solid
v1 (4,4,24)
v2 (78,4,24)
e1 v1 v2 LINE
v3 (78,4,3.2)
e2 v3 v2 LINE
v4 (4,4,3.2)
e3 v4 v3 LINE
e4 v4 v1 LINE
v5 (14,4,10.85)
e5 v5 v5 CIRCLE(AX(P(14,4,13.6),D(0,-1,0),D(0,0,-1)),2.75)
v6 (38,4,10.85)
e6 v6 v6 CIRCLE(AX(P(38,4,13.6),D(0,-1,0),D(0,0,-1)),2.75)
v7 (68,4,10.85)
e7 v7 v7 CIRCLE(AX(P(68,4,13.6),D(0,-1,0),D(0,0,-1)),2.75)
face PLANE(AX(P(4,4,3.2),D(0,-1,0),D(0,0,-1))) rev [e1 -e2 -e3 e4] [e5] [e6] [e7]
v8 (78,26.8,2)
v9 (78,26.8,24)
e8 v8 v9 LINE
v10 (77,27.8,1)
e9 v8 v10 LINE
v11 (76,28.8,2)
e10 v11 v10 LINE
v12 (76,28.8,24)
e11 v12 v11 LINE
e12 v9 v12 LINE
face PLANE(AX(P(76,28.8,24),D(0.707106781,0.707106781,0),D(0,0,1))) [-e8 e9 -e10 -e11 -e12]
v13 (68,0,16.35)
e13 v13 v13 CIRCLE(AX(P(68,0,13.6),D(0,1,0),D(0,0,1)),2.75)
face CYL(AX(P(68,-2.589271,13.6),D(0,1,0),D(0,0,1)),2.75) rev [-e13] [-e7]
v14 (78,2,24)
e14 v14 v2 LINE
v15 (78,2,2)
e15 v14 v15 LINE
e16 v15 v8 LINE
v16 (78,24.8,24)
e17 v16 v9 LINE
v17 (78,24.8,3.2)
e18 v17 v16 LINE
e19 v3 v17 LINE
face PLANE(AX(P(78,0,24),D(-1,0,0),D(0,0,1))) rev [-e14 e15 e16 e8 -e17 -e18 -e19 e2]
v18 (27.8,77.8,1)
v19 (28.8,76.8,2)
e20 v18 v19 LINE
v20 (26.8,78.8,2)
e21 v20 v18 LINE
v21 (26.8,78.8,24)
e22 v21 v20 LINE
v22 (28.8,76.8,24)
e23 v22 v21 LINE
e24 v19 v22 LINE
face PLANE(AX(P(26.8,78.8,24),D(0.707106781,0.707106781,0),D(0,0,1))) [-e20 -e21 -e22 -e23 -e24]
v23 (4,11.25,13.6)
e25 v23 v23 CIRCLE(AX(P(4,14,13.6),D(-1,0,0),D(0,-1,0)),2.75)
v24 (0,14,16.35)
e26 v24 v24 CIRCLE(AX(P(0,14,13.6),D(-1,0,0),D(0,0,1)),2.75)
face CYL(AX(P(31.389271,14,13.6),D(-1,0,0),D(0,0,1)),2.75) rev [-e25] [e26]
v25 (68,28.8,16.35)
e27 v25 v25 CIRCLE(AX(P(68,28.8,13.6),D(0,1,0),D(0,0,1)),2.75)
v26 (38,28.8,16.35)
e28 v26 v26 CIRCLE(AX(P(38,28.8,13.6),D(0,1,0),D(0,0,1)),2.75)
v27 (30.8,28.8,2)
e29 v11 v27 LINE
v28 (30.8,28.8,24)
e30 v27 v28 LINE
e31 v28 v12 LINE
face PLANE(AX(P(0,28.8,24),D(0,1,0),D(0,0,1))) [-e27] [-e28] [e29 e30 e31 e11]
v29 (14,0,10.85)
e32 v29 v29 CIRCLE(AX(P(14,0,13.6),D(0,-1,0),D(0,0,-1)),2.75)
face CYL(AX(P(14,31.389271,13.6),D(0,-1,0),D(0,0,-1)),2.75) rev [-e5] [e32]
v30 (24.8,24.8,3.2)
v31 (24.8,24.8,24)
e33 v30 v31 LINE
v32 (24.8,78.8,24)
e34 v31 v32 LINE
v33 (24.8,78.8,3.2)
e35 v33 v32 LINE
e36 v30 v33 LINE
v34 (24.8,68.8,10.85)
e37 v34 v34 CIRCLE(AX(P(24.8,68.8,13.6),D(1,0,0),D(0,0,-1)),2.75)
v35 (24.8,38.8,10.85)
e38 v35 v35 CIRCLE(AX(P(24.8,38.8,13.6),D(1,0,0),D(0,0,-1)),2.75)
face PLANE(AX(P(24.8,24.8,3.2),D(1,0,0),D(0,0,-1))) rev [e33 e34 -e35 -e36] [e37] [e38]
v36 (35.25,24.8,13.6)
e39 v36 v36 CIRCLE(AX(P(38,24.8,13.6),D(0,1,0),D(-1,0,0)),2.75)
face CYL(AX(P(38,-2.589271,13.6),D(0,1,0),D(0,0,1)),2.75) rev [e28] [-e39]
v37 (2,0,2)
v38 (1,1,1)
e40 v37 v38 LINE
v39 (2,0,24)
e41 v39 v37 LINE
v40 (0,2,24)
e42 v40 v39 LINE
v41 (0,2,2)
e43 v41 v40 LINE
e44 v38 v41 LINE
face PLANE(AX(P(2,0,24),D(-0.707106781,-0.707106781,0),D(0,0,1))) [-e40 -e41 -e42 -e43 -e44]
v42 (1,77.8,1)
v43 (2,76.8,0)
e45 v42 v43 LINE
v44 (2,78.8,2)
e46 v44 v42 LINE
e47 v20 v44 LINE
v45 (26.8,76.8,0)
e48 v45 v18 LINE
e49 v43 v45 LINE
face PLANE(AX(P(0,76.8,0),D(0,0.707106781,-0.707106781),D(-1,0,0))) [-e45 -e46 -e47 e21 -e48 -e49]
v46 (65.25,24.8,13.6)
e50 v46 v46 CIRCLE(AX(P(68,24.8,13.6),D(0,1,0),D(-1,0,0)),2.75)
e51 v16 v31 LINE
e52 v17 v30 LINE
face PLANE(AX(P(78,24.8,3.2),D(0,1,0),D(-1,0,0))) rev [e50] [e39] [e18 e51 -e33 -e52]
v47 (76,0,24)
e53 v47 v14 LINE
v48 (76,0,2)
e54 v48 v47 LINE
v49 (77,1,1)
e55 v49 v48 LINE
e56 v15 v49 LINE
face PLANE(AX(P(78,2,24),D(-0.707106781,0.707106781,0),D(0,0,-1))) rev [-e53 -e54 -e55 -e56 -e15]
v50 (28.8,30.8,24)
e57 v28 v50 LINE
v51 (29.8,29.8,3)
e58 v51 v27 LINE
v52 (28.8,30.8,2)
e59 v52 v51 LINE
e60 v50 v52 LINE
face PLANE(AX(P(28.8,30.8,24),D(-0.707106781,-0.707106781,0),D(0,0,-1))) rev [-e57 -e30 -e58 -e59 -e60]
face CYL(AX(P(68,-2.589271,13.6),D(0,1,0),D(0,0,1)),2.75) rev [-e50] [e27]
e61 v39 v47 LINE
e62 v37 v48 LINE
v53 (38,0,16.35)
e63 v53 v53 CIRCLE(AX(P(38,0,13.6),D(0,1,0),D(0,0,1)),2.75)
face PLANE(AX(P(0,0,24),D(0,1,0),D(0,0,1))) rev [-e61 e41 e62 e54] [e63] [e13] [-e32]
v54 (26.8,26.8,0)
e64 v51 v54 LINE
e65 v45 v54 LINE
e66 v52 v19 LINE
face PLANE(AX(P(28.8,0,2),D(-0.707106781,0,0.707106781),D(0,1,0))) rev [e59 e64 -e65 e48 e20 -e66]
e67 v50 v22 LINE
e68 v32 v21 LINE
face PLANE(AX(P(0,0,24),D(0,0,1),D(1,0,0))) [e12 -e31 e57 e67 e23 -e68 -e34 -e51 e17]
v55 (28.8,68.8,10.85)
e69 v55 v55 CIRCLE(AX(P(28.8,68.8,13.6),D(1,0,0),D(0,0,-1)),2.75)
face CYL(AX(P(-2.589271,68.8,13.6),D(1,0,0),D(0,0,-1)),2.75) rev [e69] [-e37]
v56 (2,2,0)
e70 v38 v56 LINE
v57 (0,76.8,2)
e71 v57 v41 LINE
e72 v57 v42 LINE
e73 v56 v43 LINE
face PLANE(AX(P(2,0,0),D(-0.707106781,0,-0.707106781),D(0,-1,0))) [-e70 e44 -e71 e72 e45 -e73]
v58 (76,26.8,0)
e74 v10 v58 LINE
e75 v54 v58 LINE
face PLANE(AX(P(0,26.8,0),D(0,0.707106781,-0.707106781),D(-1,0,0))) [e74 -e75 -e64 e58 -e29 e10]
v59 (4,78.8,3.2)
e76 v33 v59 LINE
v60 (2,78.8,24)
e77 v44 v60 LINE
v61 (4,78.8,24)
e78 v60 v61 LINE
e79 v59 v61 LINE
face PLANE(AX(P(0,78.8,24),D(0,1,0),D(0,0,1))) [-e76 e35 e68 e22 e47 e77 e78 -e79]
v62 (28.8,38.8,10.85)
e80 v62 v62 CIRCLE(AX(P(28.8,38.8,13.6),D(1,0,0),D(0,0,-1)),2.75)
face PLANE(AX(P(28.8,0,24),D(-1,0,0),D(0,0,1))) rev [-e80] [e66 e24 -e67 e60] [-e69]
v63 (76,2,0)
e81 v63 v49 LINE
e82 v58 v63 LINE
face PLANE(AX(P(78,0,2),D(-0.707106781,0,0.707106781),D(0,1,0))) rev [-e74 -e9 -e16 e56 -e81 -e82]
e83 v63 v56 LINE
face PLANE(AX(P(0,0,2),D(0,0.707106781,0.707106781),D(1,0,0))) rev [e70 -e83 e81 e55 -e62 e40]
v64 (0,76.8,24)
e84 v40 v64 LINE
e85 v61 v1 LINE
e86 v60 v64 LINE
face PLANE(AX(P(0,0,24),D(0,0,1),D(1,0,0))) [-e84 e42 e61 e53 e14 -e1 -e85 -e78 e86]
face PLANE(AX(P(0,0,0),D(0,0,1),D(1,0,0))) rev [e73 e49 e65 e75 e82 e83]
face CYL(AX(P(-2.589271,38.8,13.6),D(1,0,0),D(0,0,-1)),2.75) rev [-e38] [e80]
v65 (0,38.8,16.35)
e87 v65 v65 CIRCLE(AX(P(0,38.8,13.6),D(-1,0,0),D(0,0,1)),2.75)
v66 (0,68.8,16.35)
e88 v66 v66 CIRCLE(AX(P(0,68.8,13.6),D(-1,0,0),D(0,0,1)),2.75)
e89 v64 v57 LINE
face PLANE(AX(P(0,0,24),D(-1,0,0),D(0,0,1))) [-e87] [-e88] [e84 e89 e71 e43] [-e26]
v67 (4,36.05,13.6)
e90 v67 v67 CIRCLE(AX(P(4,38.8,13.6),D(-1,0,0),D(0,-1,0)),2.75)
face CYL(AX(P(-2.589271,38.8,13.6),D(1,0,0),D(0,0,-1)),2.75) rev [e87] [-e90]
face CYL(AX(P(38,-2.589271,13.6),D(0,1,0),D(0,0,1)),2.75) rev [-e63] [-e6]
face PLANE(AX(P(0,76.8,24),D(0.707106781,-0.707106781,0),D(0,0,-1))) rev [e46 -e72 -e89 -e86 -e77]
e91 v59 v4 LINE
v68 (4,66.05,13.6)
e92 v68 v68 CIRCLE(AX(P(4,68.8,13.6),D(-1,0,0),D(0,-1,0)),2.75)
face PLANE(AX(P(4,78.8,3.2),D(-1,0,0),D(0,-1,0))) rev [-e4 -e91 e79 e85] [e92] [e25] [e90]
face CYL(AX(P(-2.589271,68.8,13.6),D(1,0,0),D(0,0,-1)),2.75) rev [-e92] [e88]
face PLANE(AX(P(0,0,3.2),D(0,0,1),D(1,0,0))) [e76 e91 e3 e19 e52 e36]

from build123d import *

# Parameters (mm, degrees)
ESQUISSE2_W             = 28.8
ESQUISSE2_H             = 50
ESQUISSE2_W_2           = 78
ESQUISSE2_H_2           = 28.8
BOSS_EXTRU_2_DEPTH      = 24
ENL_V_MAT_EXTRU_1_DEPTH = 20.8
ESQUISSE4_R             = 2.75
ENL_V_MAT_EXTRU_2_DEPTH = 31.389271111
ESQUISSE5_R             = 2.75
ENL_V_MAT_EXTRU_3_DEPTH = 31.389271111
ESQUISSE6_R             = 2.75
ENL_V_MAT_EXTRU_4_DEPTH = 31.389271111
ESQUISSE7_R             = 2.75
ENL_V_MAT_EXTRU_5_DEPTH = 31.389271111
CHANFREIN1_SIZE         = 2
CHANFREIN2_SIZE         = 2


with BuildPart() as part:
    # Esquisse2 → Boss.-Extru.2 (new body)
    with BuildSketch(Plane.XY):
        with Locations((14.4, 53.8)):
            Rectangle(ESQUISSE2_W, ESQUISSE2_H)
        with Locations((39, 14.4)):
            Rectangle(ESQUISSE2_W_2, ESQUISSE2_H_2)
    extrude(amount=BOSS_EXTRU_2_DEPTH)

    # Esquisse3 → Enlèv. mat.-Extru.1 (cut)
    with BuildSketch(Plane.XY.offset(24)):
        Polygon((4, 78.8), (4, 4), (78, 4), (78, 24.8), (24.8, 24.8), (24.8, 78.8), align=None)
    extrude(amount=-ENL_V_MAT_EXTRU_1_DEPTH, mode=Mode.SUBTRACT)

    # Esquisse4 → Enlèv. mat.-Extru.2 (cut)
    with BuildSketch(Plane(origin=(0, 28.8, 0), x_dir=(1, 0, 0), z_dir=(0, 1, 0))):
        with Locations(Location((68, -13.6, 0), (0, 0, 270))):
            Circle(ESQUISSE4_R)
        with Locations(Location((38, -13.6, 0), (0, 0, 270))):
            Circle(ESQUISSE4_R)
    extrude(amount=-ENL_V_MAT_EXTRU_2_DEPTH, mode=Mode.SUBTRACT)

    # Esquisse5 → Enlèv. mat.-Extru.3 (cut)
    with BuildSketch(Plane(origin=(28.8, 0, 0), x_dir=(0, 0, -1), z_dir=(1, 0, 0))):
        with Locations(Location((-13.6, 38.8, 0), (0, 0, 270))):
            Circle(ESQUISSE5_R)
        with Locations(Location((-13.6, 68.8, 0), (0, 0, 270))):
            Circle(ESQUISSE5_R)
    extrude(amount=-ENL_V_MAT_EXTRU_3_DEPTH, mode=Mode.SUBTRACT)

    # Esquisse6 → Enlèv. mat.-Extru.4 (cut)
    with BuildSketch(Plane.ZY):
        with Locations((13.6, 14)):
            Circle(ESQUISSE6_R)
    extrude(amount=-ENL_V_MAT_EXTRU_4_DEPTH, mode=Mode.SUBTRACT)

    # Esquisse7 → Enlèv. mat.-Extru.5 (cut)
    with BuildSketch(Plane.XZ):
        with Locations(Location((14, 13.6, 0), (0, 0, 270))):
            Circle(ESQUISSE7_R)
    extrude(amount=-ENL_V_MAT_EXTRU_5_DEPTH, mode=Mode.SUBTRACT)

    # Chanfrein1
    chanfrein1_edges = [part.edges().sort_by_distance(p)[0] for p in [
        (28.8, 53.8, 0),
        (53.4, 28.8, 0),
        (39, 0, 0),
        (0, 39.4, 0),
    ]]
    chamfer(chanfrein1_edges, length=CHANFREIN1_SIZE)

    # Chanfrein2
    # the kernel refuses this chamfer: 2 mm, written as the material it adds along each edge
    with BuildSketch(Plane(origin=(28.8, 28.8, -3.143365976), x_dir=(-0.027495876610585647, 0.9996219169112968, 0), z_dir=(0, 0, 1))) as chanfrein2_piece_1_section:
        Polygon((CHANFREIN2_SIZE * 0.999621916911, -CHANFREIN2_SIZE * 0.0274958766106), (-CHANFREIN2_SIZE * 0.0274958766106, -CHANFREIN2_SIZE * 0.999621916911), (0, 0), align=None)
    chanfrein2_piece_1 = extrude(amount=27.143365976, mode=Mode.PRIVATE)
    chanfrein2_piece_1 = split(chanfrein2_piece_1, bisect_by=Plane(origin=(29.819330427, 29.005558504, 3.019330427), z_dir=(0.7071067811865476, 0, -0.7071067811865476)), keep=Keep.TOP, mode=Mode.PRIVATE)
    chanfrein2_piece_1 = split(chanfrein2_piece_1, bisect_by=Plane(origin=(30.090587735, 29.276815812, 2.476815812), z_dir=(0, -0.7071067811865476, 0.7071067811865476)), keep=Keep.TOP, mode=Mode.PRIVATE)
    add(chanfrein2_piece_1)
    with BuildSketch(Plane(origin=(28.8, 28.8, -3.143365976), x_dir=(-0.027495876610585647, 0.9996219169112968, 0), z_dir=(0, 0, 1))) as chanfrein2_piece_2_section:
        Polygon((CHANFREIN2_SIZE * 0.999621916911, -CHANFREIN2_SIZE * 0.0274958766106), (-CHANFREIN2_SIZE * 0.0274958766106, -CHANFREIN2_SIZE * 0.999621916911), (0, 0), align=None)
    chanfrein2_piece_2 = extrude(amount=27.143365976, mode=Mode.PRIVATE)
    chanfrein2_piece_2 = split(chanfrein2_piece_2, bisect_by=Plane(origin=(29.276815812, 30.090587735, 2.476815812), z_dir=(-0.7071067811865476, 0, 0.7071067811865476)), keep=Keep.TOP, mode=Mode.PRIVATE)
    chanfrein2_piece_2 = split(chanfrein2_piece_2, bisect_by=Plane(origin=(29.005558504, 29.819330427, 3.019330427), z_dir=(0, 0.7071067811865476, -0.7071067811865476)), keep=Keep.TOP, mode=Mode.PRIVATE)
    add(chanfrein2_piece_2)
    with BuildSketch(Plane(origin=(28.8, 28.8, -3.143365976), x_dir=(-0.027495876610585647, 0.9996219169112968, 0), z_dir=(0, 0, 1))) as chanfrein2_piece_3_section:
        Polygon((CHANFREIN2_SIZE * 0.999621916911, -CHANFREIN2_SIZE * 0.0274958766106), (-CHANFREIN2_SIZE * 0.0274958766106, -CHANFREIN2_SIZE * 0.999621916911), (0, 0), align=None)
    chanfrein2_piece_3 = extrude(amount=27.143365976, mode=Mode.PRIVATE)
    chanfrein2_piece_3 = split(chanfrein2_piece_3, bisect_by=Plane(origin=(34.880092378, 29.455254944, 8.080092378), z_dir=(-0.7071067811865476, 0, 0.7071067811865476)), keep=Keep.TOP, mode=Mode.PRIVATE)
    chanfrein2_piece_3 = split(chanfrein2_piece_3, bisect_by=Plane(origin=(29.455254944, 34.880092378, 8.080092378), z_dir=(0, -0.7071067811865476, 0.7071067811865476)), keep=Keep.TOP, mode=Mode.PRIVATE)
    add(chanfrein2_piece_3)
    # the kernel refuses this chamfer: 2 mm, written as the material it takes off along each edge
    with BuildSketch(Plane(origin=(0, 0, -3.143365976), x_dir=(-0.027495876610586372, 0.9996219169112968, 0), z_dir=(0, 0, 1)), Plane(origin=(28.8, 78.8, -3.143365976), x_dir=(0.02749587661058555, -0.9996219169112968, 0), z_dir=(0, 0, 1)), Plane(origin=(78, 28.8, -3.143365976), x_dir=(0.0274958766105891, -0.9996219169112968, 0), z_dir=(0, 0, 1))) as chanfrein2_2_piece_1:
        Polygon((CHANFREIN2_SIZE * 0.999621916911, -CHANFREIN2_SIZE * 0.0274958766106), (-CHANFREIN2_SIZE * 0.0274958766106, -CHANFREIN2_SIZE * 0.999621916911), (0, 0), align=None)
    extrude(amount=32.286731952, mode=Mode.SUBTRACT)
    with BuildSketch(Plane(origin=(0, 78.8, -3.143365976), x_dir=(-0.027495876610586292, -0.9996219169112968, 0), z_dir=(0, 0, 1)), Plane(origin=(78, 0, -3.143365976), x_dir=(0.02749587661058908, 0.9996219169112968, 0), z_dir=(0, 0, 1))) as chanfrein2_2_piece_2:
        Polygon((CHANFREIN2_SIZE * 0.999621916911, CHANFREIN2_SIZE * 0.0274958766106), (-CHANFREIN2_SIZE * 0.0274958766106, CHANFREIN2_SIZE * 0.999621916911), (0, 0), align=None)
    extrude(amount=32.286731952, mode=Mode.SUBTRACT)
    with BuildSketch(Plane(origin=(31.943365976, 78.8, 0), x_dir=(0, -0.9996219169112968, -0.027495876610586292), z_dir=(-1, 0, 0))) as chanfrein2_2_piece_3:
        Polygon((CHANFREIN2_SIZE * 0.999621916911, CHANFREIN2_SIZE * 0.0274958766106), (-CHANFREIN2_SIZE * 0.0274958766106, CHANFREIN2_SIZE * 0.999621916911), (0, 0), align=None)
    extrude(amount=35.086731952, mode=Mode.SUBTRACT)
    with BuildSketch(Plane(origin=(78, -3.143365976, 0), x_dir=(0.02749587661058908, 0, 0.9996219169112968), z_dir=(0, 1, 0))) as chanfrein2_2_piece_4:
        Polygon((CHANFREIN2_SIZE * 0.999621916911, -CHANFREIN2_SIZE * 0.0274958766106), (-CHANFREIN2_SIZE * 0.0274958766106, -CHANFREIN2_SIZE * 0.999621916911), (0, 0), align=None)
    extrude(amount=35.086731952, mode=Mode.SUBTRACT)


solid = part.part
